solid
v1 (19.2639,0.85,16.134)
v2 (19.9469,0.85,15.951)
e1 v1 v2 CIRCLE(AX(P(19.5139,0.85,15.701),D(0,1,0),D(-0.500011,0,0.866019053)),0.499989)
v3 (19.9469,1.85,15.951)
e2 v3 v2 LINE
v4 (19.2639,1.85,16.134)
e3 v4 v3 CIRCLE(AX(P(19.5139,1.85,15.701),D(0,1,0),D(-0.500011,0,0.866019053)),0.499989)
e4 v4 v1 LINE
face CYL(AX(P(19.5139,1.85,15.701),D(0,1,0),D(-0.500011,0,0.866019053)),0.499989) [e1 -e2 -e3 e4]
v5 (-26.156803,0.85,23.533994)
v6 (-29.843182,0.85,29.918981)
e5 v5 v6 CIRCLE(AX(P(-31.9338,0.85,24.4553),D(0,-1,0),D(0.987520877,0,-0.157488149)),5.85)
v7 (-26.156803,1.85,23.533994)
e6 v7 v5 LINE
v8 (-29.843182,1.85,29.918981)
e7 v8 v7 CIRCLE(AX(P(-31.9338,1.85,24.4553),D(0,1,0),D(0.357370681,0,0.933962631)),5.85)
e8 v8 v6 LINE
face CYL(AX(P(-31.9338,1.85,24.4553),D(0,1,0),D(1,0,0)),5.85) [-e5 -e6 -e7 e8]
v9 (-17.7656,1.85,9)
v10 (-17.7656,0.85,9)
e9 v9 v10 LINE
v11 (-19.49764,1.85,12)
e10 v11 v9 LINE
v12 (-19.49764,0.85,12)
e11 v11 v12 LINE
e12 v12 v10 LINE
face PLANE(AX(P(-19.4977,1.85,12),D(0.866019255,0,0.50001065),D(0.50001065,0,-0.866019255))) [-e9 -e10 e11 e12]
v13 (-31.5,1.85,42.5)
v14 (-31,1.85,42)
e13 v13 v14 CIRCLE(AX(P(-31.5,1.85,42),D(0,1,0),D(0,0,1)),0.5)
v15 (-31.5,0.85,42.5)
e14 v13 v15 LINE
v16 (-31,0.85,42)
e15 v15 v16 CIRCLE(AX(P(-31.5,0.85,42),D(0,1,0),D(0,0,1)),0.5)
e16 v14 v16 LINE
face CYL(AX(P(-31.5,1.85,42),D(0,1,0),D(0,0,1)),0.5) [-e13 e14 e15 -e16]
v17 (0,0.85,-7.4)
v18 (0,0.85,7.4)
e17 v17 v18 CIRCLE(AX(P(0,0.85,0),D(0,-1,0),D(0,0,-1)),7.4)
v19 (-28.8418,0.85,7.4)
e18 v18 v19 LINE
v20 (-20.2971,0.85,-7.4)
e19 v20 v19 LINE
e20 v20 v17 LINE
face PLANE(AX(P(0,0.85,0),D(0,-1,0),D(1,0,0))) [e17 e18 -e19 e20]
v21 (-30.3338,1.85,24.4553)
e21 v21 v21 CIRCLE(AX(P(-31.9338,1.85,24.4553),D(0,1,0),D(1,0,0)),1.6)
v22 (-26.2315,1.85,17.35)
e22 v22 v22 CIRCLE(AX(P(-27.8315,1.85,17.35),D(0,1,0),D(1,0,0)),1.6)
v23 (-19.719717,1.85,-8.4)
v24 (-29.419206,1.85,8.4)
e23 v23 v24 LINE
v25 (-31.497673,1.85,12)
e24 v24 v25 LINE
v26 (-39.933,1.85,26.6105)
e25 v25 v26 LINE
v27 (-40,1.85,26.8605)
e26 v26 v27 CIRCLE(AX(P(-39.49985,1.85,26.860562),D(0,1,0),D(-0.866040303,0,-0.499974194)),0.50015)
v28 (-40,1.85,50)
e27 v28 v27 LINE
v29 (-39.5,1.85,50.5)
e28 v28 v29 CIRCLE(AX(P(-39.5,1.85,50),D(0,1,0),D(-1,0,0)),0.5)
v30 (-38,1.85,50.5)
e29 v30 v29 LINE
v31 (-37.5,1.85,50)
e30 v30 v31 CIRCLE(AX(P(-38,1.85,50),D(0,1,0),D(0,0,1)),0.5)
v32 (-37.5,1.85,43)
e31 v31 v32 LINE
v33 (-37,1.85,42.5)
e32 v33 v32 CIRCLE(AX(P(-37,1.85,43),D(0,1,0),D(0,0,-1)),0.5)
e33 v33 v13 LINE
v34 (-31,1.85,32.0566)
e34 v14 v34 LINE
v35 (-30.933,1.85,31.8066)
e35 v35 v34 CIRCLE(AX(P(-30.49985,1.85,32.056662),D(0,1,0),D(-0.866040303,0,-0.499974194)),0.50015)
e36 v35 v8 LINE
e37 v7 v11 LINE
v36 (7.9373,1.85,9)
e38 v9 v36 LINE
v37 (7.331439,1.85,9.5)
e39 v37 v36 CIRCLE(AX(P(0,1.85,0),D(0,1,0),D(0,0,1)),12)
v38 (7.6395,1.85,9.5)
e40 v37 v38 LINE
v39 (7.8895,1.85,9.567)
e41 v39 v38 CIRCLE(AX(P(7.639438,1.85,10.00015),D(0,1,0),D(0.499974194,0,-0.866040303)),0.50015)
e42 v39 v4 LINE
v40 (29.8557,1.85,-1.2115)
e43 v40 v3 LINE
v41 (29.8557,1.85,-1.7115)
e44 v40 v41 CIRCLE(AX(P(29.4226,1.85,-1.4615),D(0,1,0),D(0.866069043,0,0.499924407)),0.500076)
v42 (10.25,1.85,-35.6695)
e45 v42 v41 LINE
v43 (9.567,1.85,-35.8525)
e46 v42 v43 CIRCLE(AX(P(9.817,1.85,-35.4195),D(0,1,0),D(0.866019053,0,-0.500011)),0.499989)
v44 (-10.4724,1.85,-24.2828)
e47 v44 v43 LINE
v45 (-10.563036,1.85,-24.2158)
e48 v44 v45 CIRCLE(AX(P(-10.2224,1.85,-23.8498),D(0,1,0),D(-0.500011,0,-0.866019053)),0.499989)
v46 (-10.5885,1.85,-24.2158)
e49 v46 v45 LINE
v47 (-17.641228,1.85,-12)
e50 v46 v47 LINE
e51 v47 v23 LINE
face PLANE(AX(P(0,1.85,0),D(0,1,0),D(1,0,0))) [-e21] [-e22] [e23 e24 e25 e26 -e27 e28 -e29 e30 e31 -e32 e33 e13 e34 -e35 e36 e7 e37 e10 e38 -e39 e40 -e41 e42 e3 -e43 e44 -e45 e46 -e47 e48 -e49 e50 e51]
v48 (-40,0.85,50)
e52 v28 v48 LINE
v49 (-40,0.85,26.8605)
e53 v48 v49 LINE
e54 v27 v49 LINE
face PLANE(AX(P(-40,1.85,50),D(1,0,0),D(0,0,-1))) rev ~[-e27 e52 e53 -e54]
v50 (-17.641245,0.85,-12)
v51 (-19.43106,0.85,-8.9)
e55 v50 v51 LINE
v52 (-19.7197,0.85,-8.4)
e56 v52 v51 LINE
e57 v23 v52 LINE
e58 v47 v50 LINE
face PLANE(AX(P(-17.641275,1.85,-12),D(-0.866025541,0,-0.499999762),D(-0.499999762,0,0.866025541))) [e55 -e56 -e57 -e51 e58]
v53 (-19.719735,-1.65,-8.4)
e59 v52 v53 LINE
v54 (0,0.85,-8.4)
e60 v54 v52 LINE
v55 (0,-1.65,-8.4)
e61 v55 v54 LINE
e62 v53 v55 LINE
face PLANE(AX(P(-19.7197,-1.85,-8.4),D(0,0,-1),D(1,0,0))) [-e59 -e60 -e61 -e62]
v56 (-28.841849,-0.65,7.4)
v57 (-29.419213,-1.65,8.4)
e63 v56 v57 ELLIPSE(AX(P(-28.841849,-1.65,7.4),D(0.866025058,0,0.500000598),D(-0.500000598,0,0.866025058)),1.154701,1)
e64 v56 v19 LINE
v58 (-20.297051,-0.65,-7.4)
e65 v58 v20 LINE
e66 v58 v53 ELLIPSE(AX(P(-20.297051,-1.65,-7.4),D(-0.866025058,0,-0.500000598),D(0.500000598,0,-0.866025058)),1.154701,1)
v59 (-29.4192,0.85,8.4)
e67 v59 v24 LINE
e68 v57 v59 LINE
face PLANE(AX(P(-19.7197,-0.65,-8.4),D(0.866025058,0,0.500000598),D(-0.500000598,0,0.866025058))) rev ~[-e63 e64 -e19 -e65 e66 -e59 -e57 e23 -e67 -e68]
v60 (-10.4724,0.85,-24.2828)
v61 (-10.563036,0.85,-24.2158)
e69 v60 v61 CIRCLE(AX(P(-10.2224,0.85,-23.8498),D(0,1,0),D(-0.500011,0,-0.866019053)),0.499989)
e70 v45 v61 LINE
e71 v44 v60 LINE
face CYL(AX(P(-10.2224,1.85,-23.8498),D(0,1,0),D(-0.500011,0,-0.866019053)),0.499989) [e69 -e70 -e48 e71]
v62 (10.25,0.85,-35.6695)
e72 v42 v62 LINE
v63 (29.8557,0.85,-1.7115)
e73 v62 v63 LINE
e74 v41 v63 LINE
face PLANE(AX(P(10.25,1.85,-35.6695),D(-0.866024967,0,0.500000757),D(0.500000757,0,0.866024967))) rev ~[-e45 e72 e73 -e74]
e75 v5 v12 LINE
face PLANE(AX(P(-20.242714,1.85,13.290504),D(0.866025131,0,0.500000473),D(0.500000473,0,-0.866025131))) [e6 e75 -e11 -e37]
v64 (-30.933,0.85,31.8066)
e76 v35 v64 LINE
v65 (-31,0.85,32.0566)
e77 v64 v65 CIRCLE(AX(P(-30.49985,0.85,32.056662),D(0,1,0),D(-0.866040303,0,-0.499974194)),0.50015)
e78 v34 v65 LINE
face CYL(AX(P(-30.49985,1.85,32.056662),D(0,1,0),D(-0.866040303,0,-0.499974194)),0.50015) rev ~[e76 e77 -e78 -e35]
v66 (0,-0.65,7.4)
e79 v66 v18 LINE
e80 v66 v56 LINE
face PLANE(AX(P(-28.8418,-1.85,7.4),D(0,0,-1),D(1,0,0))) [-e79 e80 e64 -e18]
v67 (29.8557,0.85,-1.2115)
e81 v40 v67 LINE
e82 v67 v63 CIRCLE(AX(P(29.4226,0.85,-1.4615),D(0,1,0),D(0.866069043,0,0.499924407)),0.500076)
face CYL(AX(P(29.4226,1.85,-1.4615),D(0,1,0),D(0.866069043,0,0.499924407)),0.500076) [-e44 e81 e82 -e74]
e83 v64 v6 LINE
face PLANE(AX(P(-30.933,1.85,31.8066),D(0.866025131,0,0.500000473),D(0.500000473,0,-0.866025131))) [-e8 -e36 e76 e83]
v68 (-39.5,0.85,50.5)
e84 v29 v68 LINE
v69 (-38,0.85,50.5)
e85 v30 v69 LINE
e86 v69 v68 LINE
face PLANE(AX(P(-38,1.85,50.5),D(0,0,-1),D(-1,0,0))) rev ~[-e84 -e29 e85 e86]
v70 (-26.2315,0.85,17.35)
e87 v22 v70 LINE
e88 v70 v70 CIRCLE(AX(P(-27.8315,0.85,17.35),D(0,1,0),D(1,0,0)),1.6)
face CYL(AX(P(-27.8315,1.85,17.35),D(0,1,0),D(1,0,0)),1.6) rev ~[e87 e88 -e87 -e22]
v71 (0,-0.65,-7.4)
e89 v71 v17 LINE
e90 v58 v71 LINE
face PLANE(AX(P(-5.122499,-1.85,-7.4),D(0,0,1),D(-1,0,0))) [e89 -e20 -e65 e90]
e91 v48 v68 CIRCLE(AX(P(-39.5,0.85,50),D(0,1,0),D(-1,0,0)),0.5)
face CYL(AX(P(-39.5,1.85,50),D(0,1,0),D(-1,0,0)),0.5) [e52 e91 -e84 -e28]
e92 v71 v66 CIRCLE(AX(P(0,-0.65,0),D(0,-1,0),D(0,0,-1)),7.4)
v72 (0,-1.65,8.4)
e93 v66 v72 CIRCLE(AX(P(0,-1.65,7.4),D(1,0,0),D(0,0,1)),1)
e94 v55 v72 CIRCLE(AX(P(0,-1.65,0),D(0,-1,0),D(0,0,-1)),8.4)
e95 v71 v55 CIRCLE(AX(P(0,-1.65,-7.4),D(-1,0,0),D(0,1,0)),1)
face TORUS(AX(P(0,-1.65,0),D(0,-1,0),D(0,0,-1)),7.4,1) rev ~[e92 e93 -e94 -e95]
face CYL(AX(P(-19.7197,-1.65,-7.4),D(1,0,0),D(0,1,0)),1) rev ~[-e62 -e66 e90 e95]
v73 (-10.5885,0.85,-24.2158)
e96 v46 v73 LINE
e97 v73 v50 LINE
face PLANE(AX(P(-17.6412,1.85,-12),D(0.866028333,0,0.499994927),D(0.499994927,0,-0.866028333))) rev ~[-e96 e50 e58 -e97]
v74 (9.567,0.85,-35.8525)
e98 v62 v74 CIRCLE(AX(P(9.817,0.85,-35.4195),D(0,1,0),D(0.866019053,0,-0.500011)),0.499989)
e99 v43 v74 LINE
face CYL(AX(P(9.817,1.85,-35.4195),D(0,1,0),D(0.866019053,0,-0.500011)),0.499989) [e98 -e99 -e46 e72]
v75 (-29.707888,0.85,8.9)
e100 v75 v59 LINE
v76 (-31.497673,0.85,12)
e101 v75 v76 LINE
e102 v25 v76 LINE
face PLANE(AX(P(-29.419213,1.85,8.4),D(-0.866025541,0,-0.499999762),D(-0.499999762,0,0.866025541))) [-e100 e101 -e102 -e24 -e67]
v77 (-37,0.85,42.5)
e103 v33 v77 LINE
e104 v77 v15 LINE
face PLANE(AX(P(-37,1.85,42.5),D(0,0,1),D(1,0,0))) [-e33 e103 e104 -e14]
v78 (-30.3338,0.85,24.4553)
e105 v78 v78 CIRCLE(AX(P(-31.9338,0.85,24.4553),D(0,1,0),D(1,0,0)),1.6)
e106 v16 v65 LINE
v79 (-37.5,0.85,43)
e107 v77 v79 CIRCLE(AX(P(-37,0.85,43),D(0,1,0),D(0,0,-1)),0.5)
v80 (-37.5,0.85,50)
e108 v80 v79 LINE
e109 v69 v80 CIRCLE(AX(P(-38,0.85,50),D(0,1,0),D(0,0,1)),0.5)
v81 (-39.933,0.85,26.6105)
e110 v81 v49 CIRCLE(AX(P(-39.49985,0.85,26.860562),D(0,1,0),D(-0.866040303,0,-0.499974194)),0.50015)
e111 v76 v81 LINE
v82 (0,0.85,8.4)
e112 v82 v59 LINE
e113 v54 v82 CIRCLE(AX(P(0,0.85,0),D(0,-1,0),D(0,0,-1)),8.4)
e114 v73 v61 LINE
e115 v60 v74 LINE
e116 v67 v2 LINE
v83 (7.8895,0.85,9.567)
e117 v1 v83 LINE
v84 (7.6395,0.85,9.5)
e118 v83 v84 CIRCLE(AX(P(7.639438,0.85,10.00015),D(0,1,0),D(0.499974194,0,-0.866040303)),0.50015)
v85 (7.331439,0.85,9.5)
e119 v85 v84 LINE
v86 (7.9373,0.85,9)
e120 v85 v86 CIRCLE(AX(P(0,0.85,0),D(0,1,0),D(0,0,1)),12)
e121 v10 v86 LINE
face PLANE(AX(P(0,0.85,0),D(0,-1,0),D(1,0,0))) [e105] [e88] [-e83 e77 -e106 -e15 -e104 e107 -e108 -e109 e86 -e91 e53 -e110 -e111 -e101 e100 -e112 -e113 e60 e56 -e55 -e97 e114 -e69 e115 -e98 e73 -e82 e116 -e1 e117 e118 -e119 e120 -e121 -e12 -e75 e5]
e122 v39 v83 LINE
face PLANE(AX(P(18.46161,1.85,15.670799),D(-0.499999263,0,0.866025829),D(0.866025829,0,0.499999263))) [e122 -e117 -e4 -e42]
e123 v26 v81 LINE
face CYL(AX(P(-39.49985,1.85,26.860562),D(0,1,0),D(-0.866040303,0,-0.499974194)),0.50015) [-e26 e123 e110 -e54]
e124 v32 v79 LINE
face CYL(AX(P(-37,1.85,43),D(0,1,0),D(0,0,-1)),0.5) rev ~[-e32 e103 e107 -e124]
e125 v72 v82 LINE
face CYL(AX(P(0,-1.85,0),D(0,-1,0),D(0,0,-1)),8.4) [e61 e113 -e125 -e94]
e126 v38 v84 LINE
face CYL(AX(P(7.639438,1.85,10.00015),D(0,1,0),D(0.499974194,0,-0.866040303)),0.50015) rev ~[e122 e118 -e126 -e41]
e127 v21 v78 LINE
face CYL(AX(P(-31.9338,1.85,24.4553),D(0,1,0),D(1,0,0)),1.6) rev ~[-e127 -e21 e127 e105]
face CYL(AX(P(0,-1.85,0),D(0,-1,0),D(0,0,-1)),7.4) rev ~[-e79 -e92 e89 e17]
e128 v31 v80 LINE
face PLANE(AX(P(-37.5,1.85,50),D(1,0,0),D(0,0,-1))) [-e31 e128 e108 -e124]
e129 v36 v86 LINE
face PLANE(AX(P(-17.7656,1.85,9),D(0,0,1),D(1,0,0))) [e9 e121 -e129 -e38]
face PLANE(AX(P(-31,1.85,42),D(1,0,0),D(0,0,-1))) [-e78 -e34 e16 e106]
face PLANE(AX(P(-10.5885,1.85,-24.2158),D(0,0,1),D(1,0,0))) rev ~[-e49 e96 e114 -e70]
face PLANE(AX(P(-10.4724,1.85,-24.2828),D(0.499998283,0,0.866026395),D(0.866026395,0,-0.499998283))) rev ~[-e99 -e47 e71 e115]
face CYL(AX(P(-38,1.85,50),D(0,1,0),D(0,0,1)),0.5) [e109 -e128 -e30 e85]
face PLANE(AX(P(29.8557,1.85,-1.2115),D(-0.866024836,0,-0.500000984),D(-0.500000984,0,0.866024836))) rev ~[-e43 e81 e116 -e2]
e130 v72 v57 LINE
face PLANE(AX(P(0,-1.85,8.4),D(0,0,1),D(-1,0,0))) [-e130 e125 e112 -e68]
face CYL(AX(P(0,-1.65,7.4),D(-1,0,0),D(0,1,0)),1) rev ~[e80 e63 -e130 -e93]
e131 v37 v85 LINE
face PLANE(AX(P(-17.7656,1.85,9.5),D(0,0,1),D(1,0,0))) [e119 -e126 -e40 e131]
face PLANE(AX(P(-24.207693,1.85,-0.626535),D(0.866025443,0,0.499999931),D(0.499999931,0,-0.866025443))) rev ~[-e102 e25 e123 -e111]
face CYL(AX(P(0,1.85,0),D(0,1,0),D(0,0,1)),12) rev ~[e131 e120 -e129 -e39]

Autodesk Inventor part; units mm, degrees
ref_plane "YZ Plane" through (0, 0, 0) normal (1, 0, 0) x (0, 1, 0)
ref_plane "XZ Plane" through (0, 0, 0) normal (0, 1, 0) x (-1, 0, 0)
sketch "スケッチ1" plane through (0, 0, 0) normal (0, 1, 0) x (-1, 0, 0)
  circle A0 centre (0, 0) radius 8.9
  line L0 (0, -8.9) -> (63.2748, -8.9)
  line L1 (63.2748, -8.9) -> (63.2748, 8.9)
  line L2 (63.2748, 8.9) -> (0, 8.9)
  line L3 (0, 8.9) -> (0, -8.9)
  circle A1 centre (0, 0) radius 8.4
  line L4 (0, -8.4) -> (63.2748, -8.4)
  line L5 (63.2748, -8.4) -> (63.2748, 8.4)
  line L6 (63.2748, 8.4) -> (0, 8.4)
  line L7 (0, 8.4) -> (0, -8.4)
  point P0 (0, 8.4)
  point P1 (0, 8.9)
  dimension "d0" = 17.8
  dimension "d1" = 16.8
extrude "押し出し1" add sketch "スケッチ1" along normal blind 0.85 contours L3 A1 A0 | L2 L1 L6 A0 | A0 L6 L3 | L3 L4 A0 | A0 L4 L1 L0
sketch "スケッチ2" plane through (0, 0.85, 0) normal (0, 1, 0) x (1, 0, 0)
  circle A0 centre (0, 0) radius 12
  line L0 (0, 12) -> (-63.2748, 12)
  line L1 (-63.2748, 12) -> (-63.2748, -12)
  line L2 (-63.2748, -12) -> (0, -12)
  line L3 (0, -12) -> (0, 12)
  line L4 (-63.2748, 8.9) -> (-63.2748, 8.4) projected
  line L5 (-63.2748, 8.4) -> (0, 8.4) projected
  line L6 (0, -8.4) -> (-63.2748, -8.4) projected
  arc A1 (0, -8.4) -> (0, 8.4) centre (0, 0) ccw projected
  point P0 (0, -12)
  dimension "d4" = 24
extrude "押し出し2" add sketch "スケッチ2" along normal blind 1 contours A0 L3 A1 | L3 L5 A0 | A0 L5 L1 L0 | L2 L1 L6 A0 | A0 L6 L3
mirror "ミラー1" about plane through (-27.1874, 0, 0) normal (0, -1, 0)
sketch "スケッチ3" plane through (0, 1.85, 0) normal (0, 1, 0) x (1, 0, 0)
  line L0 (-14.7409, 17.0236) -> (-35.8476, -19.5343) projected
  line L1 (0, -8.4) -> (-63.2748, -8.4) projected
  line L2 (-63.2748, -8.4) -> (-63.2748, -12) projected
  line L3 (-63.2748, -12) -> (0, -12) projected
  arc A0 (0, -12) -> (0, 12) centre (0, 0) ccw projected
  line L4 (0, 12) -> (-63.2748, 12) projected
  line L5 (-63.2748, 12) -> (-63.2748, 8.4) projected
  line L6 (-63.2748, 8.4) -> (0, 8.4) projected
  arc A1 (0, -8.4) -> (0, 8.4) centre (0, 0) ccw projected
  point P0 (-31.4977, -12)
  point P1 (-29.4192, -8.4)
  point P2 (-19.7197, 8.4)
  point P3 (-17.6412, 12)
extrude "押し出し3" cut sketch "スケッチ3" against normal through all contours L0 L6 L5 L4 | L0 L3 L2 L1
ref_plane "作業平面1" through (0, -0.65, 0) normal (0, 1, 0) x (1, 0, 0)
sketch "スケッチ4" plane through (0, -0.65, 0) normal (0, 1, 0) x (1, 0, 0)
  line L0 (-19.7197, 8.4) -> (0, 8.4) projected
  arc A0 (0, -8.4) -> (0, 8.4) centre (0, 0) ccw projected
  line L1 (0, -8.4) -> (-29.4192, -8.4) projected
  line L2 (-19.7197, 8.4) -> (-29.4192, -8.4)
  circle A1 centre (0, 0) radius 1.6
  dimension "d10" = 3.2
extrude "押し出し4" add sketch "スケッチ4" along normal up to surface (2.5 mm away)
fillet "フィレット1" radius 1 3 edges at (-9.8599, -0.65, -8.4) (8.4, -0.65, 0) (-14.7096, -0.65, 8.4)
sketch "スケッチ5" plane through (0, 1.85, 0) normal (0, 1, 0) x (1, 0, 0)
  circle A0 centre (-27.8315, -17.35) radius 1.6 projected
  circle A1 centre (-8.7282, 17.4379) radius 1.6 projected
  line L0 (0, 12) -> (-17.6412, 12) projected
  line L1 (-17.6412, 12) -> (-10.5885, 24.2158)
  line L2 (-10.5885, 24.2158) -> (0, 24.2158)
  line L3 (-39.933, -26.6105) -> (-10.6554, 24.0998) projected
  line L4 (0, 12) -> (-17.6412, 12) projected
  circle A2 centre (0, 0) radius 24.2158
  arc A3 (0, -12) -> (0, 12) centre (0, 0) ccw projected
  line L5 (11.4695, 3.5285) -> (5.2849, 23.6321)
  circle A4 centre (1.9592, 17.4379) radius 1.6
  line L6 (-39.933, -26.6105) -> (-10.6554, 24.0998) projected
  circle A5 centre (-31.9338, -24.4553) radius 1.6 projected
  circle A6 centre (-36, -34.6362) radius 1.6 projected
  circle A7 centre (-27.8315, -17.35) radius 1.6 projected
  line L7 (-39.933, -26.6105) -> (-10.6554, 24.0998) projected
  line L8 (-40, -50) -> (-40, -26.8605) projected
  line L9 (-38, -50.5) -> (-39.5, -50.5) projected
  line L10 (-31, -42) -> (-31, -32.0566) projected
  line L11 (-30.933, -31.8066) -> (-18.1986, -9.75) projected
  line L12 (-37.5, -50) -> (-37.5, -43) projected
  line L13 (-37, -42.5) -> (-31.5, -42.5) projected
  circle A8 centre (-31.9338, -24.4553) radius 5.85
  arc A9 (19.2639, -16.134) -> (19.9469, -15.951) centre (19.5139, -15.701) ccw projected
  line L14 (29.8557, 1.2115) -> (19.9469, -15.951) projected
  arc A10 (29.8557, 1.2115) -> (29.8557, 1.7115) centre (29.4226, 1.4615) ccw projected
  line L15 (10.25, 35.6695) -> (29.8557, 1.7115) projected
  arc A11 (10.25, 35.6695) -> (9.567, 35.8525) centre (9.817, 35.4195) ccw projected
  line L16 (-10.4724, 24.2828) -> (9.567, 35.8525) projected
  arc A12 (-10.4724, 24.2828) -> (-10.6554, 24.0998) centre (-10.2224, 23.8498) ccw projected
  arc A13 (-39.933, -26.6105) -> (-40, -26.8605) centre (-39.5, -26.8605) ccw projected
  arc A14 (-40, -50) -> (-39.5, -50.5) centre (-39.5, -50) ccw projected
  arc A15 (-38, -50.5) -> (-37.5, -50) centre (-38, -50) ccw projected
  arc A16 (-37, -42.5) -> (-37.5, -43) centre (-37, -43) ccw projected
  arc A17 (-31.5, -42.5) -> (-31, -42) centre (-31.5, -42) ccw projected
  arc A18 (-30.933, -31.8066) -> (-31, -32.0566) centre (-30.5, -32.0566) ccw projected
  arc A19 (-17.7656, -9.5) -> (-18.1986, -9.75) centre (-17.7656, -10) ccw projected
  line L17 (-17.7656, -9.5) -> (7.6395, -9.5) projected
  arc A20 (7.8895, -9.567) -> (7.6395, -9.5) centre (7.6395, -10) ccw projected
  line L18 (7.8895, -9.567) -> (19.2639, -16.134) projected
  circle A21 centre (1.9592, 17.4379) radius 1.6 projected
  circle A22 centre (24.5152, 1.2615) radius 1.6 projected
  circle A23 centre (5.1388, 27.5224) radius 1.6 projected
  circle A24 centre (13.1994, 17.561) radius 1.6 projected
  circle A25 centre (20.4199, -5.8317) radius 1.6 projected
  circle A26 centre (-8.7282, 17.4379) radius 1.6 projected
  circle A27 centre (0, 0) radius 1.5 projected
  point P0 (0, 24.2158)
  point P1 (-20.2427, -13.2905)
  point P2 (-12.6465, 20.6512)
  point P3 (-37, -21.5303)
  point P4 (-29.8432, -29.9191)
  point P5 (-26.1568, -23.5339)
  dimension "d14" = 15
  dimension "d15" = 3.2
  dimension "d16" = 5
extrude "押し出し5" add sketch "スケッチ5" against normal blind 1 contours A1 | A3 L17 A19 L11 A2 L3 L0 | L0 L1 A2 L5 A3 | L5 A2 A22 L18 A20 L17 A3 | L1 A12 L2 A2 | A2 L11 A8 L3 | A2 L2 A12 L16 A11 L15 A10 L14 A9 L18 A22 | L1 L2 A12 | A8 L11 A18 L10 A17 L13 A16 L12 A15 L9 A14 L8 A13 L3 | A8 L11 | A22 A2 | A2 A22 | A8 L11 | A4 | A6 | A23 | A24 | A25 | A27
sketch "スケッチ6" plane through (0, 1.85, 0) normal (0, 1, 0) x (1, 0, 0)
  line L0 (-19.4977, -12) -> (0, -12) projected
  line L1 (-19.4977, -12) -> (-17.7656, -9)
  line L2 (-17.7656, -9) -> (7.9373, -9)
  arc A0 (0, -12) -> (0, 12) centre (0, 0) ccw projected
  line L3 (-29.8432, -29.9191) -> (-19.4977, -12) projected
  point P0 (-25.741, -22.8137)
  point P1 (-20.2427, -13.2905)
  point P2 (-31, -31.9226)
  dimension "d19" = 3
extrude "押し出し6" cut sketch "スケッチ6" against normal through all
sketch "スケッチ7" plane through (0, -1.85, 0) normal (0, -1, 0) x (1, 0, 0)
  line L0 (-19.3733, -9) -> (0, -9) projected
  line L1 (-17.7656, 9) -> (-19.4977, 12) projected
  line L2 (-31.4977, 12) -> (-19.4977, 12) projected
  line L3 (-31.4977, 12) -> (-29.4192, 8.4) projected
  line L4 (0, 8.4) -> (-29.4192, 8.4) projected
  arc A0 (0, -8.4) -> (0, 8.4) centre (0, 0) ccw projected
  line L5 (-19.7197, -8.4) -> (0, -8.4) projected
  line L6 (-19.7197, -8.4) -> (-17.6412, -12) projected
  line L7 (0, -12) -> (-17.6412, -12) projected
  arc A1 (0, -12) -> (7.9373, 9) centre (0, 0) ccw projected
  line L8 (7.9373, 9) -> (-17.7656, 9) projected
  circle A2 centre (0, 0) radius 1.6 projected
  line L9 (0, -7.4) -> (-20.2971, -7.4) projected
  arc A3 (0, -7.4) -> (0, 7.4) centre (0, 0) ccw projected
  line L10 (-28.8418, 7.4) -> (0, 7.4) projected
  line L11 (-20.2971, -7.4) -> (-28.8418, 7.4) projected
  circle A4 centre (0, 0) radius 9 projected
  line L12 (-17.7656, 9) -> (7.9373, 9) projected
  line L13 (-10.5631, -24.2158) -> (-10.5885, -24.2158) projected
  arc A5 (-26.1568, 23.5339) -> (-29.8432, 29.9191) centre (-31.9338, 24.4553) ccw projected
  line L14 (-26.1568, 23.5339) -> (-17.7656, 9) projected
  circle A6 centre (-27.8315, 17.35) radius 1.6 projected
  circle A7 centre (-31.9338, 24.4553) radius 1.6 projected
  arc A8 (7.9373, 9) -> (7.3314, 9.5) centre (0, 0) ccw projected
  line L15 (7.3314, 9.5) -> (7.6395, 9.5) projected
  arc A9 (7.6395, 9.5) -> (7.8895, 9.567) centre (7.6395, 10) ccw projected
  line L16 (7.8895, 9.567) -> (19.2639, 16.134) projected
  arc A10 (19.9469, 15.951) -> (19.2639, 16.134) centre (19.5139, 15.701) ccw projected
  line L17 (19.9469, 15.951) -> (29.8557, -1.2115) projected
  arc A11 (29.8557, -1.7115) -> (29.8557, -1.2115) centre (29.4226, -1.4615) ccw projected
  line L18 (29.8557, -1.7115) -> (10.25, -35.6695) projected
  arc A12 (9.567, -35.8525) -> (10.25, -35.6695) centre (9.817, -35.4195) ccw projected
  line L19 (9.567, -35.8525) -> (-10.4724, -24.2828) projected
  arc A13 (-10.5631, -24.2158) -> (-10.4724, -24.2828) centre (-10.2224, -23.8498) ccw projected
  line L20 (-10.5885, -24.2158) -> (-39.933, 26.6105) projected
  arc A14 (-40, 26.8605) -> (-39.933, 26.6105) centre (-39.5, 26.8605) ccw projected
  line L21 (-40, 26.8605) -> (-40, 50) projected
  arc A15 (-39.5, 50.5) -> (-40, 50) centre (-39.5, 50) ccw projected
  line L22 (-39.5, 50.5) -> (-38, 50.5) projected
  arc A16 (-37.5, 50) -> (-38, 50.5) centre (-38, 50) ccw projected
  line L23 (-37.5, 50) -> (-37.5, 43) projected
  arc A17 (-37.5, 43) -> (-37, 42.5) centre (-37, 43) ccw projected
  line L24 (-37, 42.5) -> (-31.5, 42.5) projected
  arc A18 (-31, 42) -> (-31.5, 42.5) centre (-31.5, 42) ccw projected
  line L25 (-31, 42) -> (-31, 32.0566) projected
  arc A19 (-31, 32.0566) -> (-30.933, 31.8066) centre (-30.5, 32.0566) ccw projected
  line L26 (-30.933, 31.8066) -> (-29.8432, 29.9191) projected
extrude "押し出し7" cut sketch "スケッチ7" against normal up to surface (2.7 mm away) contours L6 L5 A4 L0 | L0 A4 L8 A1 L7 L6 | A4 L5 A0 L4 | L11 L10 A4 L9 | A4 L4 L3 L2 L1 L8 | A4 L10 A3 L9 | A2
properties part number "screw_cover_upper"
